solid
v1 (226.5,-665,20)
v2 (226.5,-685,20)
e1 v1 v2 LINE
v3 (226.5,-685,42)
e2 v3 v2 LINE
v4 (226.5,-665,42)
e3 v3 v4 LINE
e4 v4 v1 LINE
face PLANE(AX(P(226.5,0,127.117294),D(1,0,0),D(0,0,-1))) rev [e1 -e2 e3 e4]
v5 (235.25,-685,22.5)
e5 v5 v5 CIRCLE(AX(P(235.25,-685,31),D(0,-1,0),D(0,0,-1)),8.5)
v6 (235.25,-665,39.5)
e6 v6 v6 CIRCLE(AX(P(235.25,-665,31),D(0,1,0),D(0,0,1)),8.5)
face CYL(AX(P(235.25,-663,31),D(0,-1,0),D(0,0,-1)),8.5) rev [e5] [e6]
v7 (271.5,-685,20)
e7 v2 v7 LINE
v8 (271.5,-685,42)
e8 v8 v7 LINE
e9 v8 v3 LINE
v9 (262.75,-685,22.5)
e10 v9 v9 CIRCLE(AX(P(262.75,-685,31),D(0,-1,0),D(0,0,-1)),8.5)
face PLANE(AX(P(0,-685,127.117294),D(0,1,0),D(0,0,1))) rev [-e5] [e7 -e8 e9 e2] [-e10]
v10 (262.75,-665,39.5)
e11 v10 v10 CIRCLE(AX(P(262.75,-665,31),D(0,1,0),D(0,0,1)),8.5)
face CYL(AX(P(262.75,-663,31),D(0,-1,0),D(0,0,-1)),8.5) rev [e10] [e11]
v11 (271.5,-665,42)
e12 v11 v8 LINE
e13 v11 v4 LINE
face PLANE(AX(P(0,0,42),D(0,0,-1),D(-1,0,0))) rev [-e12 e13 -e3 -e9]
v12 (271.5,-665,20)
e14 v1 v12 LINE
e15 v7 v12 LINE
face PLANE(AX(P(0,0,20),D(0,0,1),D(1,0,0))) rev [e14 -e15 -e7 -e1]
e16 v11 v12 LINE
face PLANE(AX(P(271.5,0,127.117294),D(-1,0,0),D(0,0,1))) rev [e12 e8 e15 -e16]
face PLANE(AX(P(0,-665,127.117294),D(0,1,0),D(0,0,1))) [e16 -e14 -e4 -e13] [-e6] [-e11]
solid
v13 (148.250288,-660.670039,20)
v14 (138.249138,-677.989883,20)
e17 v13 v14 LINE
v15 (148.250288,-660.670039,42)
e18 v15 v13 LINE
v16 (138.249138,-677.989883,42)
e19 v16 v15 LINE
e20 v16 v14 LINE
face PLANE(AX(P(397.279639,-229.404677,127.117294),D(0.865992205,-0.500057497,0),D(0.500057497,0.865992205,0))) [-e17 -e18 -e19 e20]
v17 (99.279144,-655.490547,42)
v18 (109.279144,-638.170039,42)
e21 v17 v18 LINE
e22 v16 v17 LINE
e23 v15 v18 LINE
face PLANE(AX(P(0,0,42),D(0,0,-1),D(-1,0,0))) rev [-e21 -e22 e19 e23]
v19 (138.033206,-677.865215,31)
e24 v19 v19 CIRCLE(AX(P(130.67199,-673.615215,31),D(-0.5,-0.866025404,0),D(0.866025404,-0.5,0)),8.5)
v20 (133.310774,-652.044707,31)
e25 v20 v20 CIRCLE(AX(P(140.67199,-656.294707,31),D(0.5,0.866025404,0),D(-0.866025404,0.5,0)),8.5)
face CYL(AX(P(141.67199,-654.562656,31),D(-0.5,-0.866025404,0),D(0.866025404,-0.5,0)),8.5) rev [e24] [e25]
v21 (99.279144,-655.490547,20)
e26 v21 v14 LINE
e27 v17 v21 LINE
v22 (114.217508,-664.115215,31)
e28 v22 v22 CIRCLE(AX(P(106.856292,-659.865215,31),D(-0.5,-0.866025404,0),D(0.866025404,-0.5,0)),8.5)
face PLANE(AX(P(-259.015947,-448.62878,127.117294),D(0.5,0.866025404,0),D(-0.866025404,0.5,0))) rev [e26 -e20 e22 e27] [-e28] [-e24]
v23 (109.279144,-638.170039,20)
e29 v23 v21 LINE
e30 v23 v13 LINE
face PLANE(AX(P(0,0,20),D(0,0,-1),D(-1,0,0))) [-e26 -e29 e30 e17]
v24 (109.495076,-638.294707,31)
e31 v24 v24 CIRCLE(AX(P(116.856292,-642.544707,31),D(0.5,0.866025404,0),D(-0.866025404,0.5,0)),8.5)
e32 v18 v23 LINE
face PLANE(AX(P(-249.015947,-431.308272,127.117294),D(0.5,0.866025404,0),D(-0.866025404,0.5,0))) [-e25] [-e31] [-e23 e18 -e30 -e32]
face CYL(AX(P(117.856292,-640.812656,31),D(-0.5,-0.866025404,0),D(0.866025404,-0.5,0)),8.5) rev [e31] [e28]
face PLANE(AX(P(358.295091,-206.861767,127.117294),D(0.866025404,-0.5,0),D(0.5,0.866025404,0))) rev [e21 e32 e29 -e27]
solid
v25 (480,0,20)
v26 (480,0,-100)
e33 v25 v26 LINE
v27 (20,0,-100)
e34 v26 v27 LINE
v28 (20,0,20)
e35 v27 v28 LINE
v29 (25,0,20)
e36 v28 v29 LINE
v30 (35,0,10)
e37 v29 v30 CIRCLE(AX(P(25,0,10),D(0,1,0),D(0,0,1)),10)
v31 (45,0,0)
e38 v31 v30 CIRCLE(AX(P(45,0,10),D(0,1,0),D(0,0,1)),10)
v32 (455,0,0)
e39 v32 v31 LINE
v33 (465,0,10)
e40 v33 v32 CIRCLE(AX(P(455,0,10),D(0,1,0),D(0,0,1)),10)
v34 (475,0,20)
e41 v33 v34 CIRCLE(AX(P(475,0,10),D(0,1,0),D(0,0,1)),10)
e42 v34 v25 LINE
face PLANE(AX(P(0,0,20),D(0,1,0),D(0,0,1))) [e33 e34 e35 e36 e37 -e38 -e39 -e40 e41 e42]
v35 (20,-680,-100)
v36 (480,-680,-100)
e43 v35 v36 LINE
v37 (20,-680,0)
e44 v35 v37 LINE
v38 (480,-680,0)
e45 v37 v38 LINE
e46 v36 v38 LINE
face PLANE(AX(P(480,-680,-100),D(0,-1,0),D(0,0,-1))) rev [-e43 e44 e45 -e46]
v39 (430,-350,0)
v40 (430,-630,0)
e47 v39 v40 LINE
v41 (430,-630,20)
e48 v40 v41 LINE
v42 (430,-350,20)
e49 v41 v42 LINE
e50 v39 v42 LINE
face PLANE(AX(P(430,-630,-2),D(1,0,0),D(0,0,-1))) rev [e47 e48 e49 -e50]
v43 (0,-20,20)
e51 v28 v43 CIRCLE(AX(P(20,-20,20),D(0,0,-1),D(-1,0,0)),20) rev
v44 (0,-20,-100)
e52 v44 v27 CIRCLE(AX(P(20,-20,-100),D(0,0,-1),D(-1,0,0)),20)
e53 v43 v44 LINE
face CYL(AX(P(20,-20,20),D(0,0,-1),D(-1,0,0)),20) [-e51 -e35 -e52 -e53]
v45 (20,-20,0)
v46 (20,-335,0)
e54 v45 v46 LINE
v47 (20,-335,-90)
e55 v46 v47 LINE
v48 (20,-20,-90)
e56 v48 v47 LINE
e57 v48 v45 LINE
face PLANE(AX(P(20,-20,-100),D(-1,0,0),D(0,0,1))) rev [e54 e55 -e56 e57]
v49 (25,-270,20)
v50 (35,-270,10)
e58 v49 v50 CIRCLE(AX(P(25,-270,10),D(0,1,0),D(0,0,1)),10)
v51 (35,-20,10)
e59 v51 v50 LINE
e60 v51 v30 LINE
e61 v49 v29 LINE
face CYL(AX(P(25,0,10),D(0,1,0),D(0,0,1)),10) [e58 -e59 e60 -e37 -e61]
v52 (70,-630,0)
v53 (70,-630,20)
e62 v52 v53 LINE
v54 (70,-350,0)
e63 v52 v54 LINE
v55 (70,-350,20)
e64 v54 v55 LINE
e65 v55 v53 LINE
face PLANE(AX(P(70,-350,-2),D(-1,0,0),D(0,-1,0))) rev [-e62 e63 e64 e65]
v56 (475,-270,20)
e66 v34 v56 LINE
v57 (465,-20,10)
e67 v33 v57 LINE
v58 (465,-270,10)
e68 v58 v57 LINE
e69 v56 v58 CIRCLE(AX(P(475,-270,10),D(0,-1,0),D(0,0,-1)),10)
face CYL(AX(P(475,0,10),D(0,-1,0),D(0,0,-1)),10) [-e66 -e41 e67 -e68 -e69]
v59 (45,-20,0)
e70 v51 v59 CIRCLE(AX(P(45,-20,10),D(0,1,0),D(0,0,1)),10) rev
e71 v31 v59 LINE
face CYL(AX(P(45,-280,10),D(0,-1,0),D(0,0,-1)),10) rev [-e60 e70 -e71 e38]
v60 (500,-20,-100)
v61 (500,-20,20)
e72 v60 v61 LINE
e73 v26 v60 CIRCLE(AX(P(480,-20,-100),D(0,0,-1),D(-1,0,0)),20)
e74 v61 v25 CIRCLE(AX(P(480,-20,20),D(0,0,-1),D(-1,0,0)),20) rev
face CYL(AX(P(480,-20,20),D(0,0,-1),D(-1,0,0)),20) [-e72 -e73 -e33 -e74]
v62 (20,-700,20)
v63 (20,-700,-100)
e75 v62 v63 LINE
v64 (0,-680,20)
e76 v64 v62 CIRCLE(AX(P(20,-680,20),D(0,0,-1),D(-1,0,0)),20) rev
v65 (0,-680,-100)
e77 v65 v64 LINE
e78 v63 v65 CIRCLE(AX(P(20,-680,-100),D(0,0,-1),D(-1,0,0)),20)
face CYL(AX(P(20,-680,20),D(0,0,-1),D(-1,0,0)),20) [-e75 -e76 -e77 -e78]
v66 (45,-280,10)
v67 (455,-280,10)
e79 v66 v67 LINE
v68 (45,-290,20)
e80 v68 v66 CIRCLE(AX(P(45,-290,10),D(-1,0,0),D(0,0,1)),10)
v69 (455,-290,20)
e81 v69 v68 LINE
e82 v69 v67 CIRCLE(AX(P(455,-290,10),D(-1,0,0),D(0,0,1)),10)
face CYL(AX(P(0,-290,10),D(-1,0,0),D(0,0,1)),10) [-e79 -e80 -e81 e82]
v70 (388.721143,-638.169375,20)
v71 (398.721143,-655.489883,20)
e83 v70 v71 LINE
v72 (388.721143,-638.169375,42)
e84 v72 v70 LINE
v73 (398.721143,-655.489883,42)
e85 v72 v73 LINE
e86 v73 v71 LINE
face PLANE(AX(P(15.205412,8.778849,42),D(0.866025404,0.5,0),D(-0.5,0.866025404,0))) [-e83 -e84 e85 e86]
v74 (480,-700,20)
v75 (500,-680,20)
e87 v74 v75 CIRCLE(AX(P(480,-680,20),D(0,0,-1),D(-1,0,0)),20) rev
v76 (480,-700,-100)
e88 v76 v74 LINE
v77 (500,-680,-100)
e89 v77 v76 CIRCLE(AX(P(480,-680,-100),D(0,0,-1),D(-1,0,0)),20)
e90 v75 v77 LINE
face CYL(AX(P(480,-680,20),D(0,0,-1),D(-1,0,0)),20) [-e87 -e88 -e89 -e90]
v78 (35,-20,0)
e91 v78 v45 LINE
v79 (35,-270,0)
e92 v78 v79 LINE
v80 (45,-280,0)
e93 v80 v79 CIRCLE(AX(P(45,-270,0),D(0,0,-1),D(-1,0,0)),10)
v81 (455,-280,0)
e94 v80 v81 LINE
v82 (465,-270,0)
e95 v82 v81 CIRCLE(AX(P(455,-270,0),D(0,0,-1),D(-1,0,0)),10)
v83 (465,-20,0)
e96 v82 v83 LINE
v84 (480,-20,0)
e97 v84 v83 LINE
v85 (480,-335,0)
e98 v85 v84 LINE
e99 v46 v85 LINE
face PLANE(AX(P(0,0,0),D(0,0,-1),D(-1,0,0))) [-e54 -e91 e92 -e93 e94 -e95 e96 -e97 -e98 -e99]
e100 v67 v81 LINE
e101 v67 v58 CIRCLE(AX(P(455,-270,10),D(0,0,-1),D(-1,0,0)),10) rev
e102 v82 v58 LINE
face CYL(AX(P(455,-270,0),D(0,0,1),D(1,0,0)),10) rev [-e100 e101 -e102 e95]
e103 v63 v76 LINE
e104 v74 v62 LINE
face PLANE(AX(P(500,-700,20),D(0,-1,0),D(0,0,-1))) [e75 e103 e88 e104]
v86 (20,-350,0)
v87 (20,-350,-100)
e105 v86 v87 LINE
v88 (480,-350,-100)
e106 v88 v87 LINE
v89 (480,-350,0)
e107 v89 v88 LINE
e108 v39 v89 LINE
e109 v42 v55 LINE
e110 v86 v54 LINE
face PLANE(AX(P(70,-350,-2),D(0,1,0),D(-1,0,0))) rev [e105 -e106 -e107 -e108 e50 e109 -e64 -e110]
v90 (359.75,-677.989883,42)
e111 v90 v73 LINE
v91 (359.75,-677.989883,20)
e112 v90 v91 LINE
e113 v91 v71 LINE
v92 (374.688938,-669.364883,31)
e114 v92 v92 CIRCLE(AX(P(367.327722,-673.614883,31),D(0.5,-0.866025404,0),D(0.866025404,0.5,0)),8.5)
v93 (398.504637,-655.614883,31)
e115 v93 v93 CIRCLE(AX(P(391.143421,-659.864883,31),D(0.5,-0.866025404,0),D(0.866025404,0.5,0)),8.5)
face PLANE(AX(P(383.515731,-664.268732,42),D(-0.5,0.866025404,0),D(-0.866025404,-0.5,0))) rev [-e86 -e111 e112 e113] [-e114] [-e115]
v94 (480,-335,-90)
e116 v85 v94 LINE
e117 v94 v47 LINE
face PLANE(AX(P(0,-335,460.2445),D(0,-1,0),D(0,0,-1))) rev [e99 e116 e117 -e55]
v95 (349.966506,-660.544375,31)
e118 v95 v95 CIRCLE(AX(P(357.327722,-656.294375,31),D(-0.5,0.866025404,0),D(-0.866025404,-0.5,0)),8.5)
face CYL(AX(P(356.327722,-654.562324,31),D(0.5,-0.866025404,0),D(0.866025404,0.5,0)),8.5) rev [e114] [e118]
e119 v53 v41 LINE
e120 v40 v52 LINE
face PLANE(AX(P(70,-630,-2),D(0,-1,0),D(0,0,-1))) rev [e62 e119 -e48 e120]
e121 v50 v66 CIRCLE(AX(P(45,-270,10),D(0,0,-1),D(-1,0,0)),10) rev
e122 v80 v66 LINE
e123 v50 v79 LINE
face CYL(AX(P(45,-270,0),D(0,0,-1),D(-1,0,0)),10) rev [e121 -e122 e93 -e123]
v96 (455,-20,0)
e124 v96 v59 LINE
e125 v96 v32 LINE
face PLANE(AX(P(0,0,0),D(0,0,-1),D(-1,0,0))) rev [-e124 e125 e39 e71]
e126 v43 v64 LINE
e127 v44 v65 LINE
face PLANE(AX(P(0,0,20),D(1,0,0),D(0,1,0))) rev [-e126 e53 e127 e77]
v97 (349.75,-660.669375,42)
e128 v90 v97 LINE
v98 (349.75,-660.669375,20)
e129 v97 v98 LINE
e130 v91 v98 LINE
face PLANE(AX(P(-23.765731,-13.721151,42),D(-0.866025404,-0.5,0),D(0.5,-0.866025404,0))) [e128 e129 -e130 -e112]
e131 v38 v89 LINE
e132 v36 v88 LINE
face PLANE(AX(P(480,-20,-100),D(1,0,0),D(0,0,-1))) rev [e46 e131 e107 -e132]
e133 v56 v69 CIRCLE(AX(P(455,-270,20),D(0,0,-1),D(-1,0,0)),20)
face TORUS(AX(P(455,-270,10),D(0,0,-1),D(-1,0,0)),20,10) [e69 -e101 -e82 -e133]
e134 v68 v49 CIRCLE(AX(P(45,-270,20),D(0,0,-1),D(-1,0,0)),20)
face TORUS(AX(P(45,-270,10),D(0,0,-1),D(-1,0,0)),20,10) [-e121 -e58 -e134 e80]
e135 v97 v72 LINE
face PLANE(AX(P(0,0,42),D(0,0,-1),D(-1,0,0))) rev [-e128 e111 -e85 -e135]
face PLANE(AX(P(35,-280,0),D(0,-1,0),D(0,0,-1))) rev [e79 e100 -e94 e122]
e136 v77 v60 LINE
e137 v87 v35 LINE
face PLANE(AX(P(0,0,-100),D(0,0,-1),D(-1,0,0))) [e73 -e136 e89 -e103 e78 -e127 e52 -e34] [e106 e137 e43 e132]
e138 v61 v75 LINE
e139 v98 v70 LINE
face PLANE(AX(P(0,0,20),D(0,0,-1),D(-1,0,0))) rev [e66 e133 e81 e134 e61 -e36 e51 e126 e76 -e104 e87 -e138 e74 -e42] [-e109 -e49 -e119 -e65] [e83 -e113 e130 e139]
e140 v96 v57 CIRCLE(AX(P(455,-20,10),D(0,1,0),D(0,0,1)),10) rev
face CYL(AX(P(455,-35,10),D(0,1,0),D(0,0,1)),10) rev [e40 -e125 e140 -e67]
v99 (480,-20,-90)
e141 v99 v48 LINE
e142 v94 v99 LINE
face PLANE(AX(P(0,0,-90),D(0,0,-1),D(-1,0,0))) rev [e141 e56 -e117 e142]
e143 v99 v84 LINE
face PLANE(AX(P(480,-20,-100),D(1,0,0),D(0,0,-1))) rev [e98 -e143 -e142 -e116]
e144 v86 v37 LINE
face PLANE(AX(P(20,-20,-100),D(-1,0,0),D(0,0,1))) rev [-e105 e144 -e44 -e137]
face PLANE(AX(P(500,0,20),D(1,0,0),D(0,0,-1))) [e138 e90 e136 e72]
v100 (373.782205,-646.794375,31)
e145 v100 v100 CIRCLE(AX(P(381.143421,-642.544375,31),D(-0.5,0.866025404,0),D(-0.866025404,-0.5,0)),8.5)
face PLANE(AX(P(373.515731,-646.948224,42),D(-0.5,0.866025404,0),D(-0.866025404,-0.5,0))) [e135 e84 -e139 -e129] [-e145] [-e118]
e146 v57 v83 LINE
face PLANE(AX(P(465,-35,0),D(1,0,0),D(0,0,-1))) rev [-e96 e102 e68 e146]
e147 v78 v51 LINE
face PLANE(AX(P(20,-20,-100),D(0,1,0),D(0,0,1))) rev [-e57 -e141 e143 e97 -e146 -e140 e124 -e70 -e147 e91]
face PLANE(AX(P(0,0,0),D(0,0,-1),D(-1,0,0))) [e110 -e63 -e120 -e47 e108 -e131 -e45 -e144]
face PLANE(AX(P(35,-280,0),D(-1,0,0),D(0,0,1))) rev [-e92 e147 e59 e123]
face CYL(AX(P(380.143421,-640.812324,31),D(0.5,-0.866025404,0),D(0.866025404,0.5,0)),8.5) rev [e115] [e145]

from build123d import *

# Parameters (mm, degrees)
SCHIZZO1_W                     = 500
SCHIZZO1_H                     = 700
ESTRUSIONE_ESTRUSIONE4_DEPTH   = 20
SCHIZZO1_4_W                   = 500
SCHIZZO1_4_H                   = 700
SCHIZZO1_4_W_2                 = 460
SCHIZZO1_4_H_2                 = 660
ESTRUSIONE_ESTRUSIONE5_DEPTH   = 100
ESTRUSIONE_ESTRUSIONE6_START   = 20
ESTRUSIONE_ESTRUSIONE6_DEPTH   = 22
SCHIZZO2_W                     = 45
SCHIZZO2_H                     = 20
ESTRUSIONE_ESTRUSIONE6_2_DEPTH = 22
ESTRUSIONE_ESTRUSIONE7_START   = 20
ESTRUSIONE_ESTRUSIONE7_DEPTH   = 22
SCHIZZO6_R                     = 8.5
TAGLIO_ESTRUSIONE1_DEPTH       = 22
SCHIZZO7_R                     = 8.5
TAGLIO_ESTRUSIONE2_DEPTH       = 22
SCHIZZO8_R                     = 8.5
TAGLIO_ESTRUSIONE3_DEPTH       = 22
SCHIZZO10_W                    = 360
SCHIZZO10_H                    = 280
TAGLIO_ESTRUSIONE4_DEPTH       = 22
RACCORDO1_R                    = 20
RACCORDO2_R                    = 20
RACCORDO3_R                    = 20
RACCORDO4_R                    = 20
SCHIZZO11_W                    = 460
SCHIZZO11_H                    = 15
ESTRUSIONE_ESTRUSIONE8_DEPTH   = 100
SCHIZZO11_3_W                  = 460
SCHIZZO11_3_H                  = 315
ESTRUSIONE_ESTRUSIONE9_DEPTH   = 10
TAGLIO_ESTRUSIONE5_DEPTH       = 20
RACCORDO5_R                    = 10
RACCORDO6_R                    = 10
RACCORDO7_R                    = 10
RACCORDO8_R                    = 10
RACCORDO9_R                    = 10


with BuildPart() as part:
    # Schizzo1 → Estrusione-Estrusione4 (new body)
    with BuildSketch(Plane.XY):
        with Locations((250, -350)):
            Rectangle(SCHIZZO1_W, SCHIZZO1_H)
    extrude(amount=ESTRUSIONE_ESTRUSIONE4_DEPTH)

    # Schizzo1<4> → Estrusione-Estrusione5 (add)
    with BuildSketch(Plane.XY):
        with Locations((250, -350)):
            Rectangle(SCHIZZO1_4_W, SCHIZZO1_4_H)
        with Locations((250, -350)):
            Rectangle(SCHIZZO1_4_W_2, SCHIZZO1_4_H_2, mode=Mode.SUBTRACT)
    extrude(amount=-ESTRUSIONE_ESTRUSIONE5_DEPTH)

    # Schizzo2<3> → Estrusione-Estrusione7 (add)
    with BuildSketch(Plane.XY.offset(ESTRUSIONE_ESTRUSIONE7_START)):
        Polygon((359.75, -677.989883085), (398.72114317, -655.489883085), (388.72114317, -638.169375009), (349.75, -660.669375009), align=None)
    extrude(amount=ESTRUSIONE_ESTRUSIONE7_DEPTH)

    # Schizzo8 → Taglio-Estrusione3 (cut)
    with BuildSketch(Plane(origin=(383.51573113, -664.26873182, 0), x_dir=(0.8660254037844405, 0.49999999999999684, 0), z_dir=(0.49999999999999684, -0.8660254037844405, 0))):
        with Locations((-18.692302531, 31)):
            Circle(SCHIZZO8_R)
        with Locations((8.807697469, 31)):
            Circle(SCHIZZO8_R)
    extrude(amount=-TAGLIO_ESTRUSIONE3_DEPTH, mode=Mode.SUBTRACT)

    # Schizzo10 → Taglio-Estrusione4 (cut)
    with BuildSketch(Plane.XY.offset(20)):
        with Locations((250, -490)):
            Rectangle(SCHIZZO10_W, SCHIZZO10_H)
    extrude(amount=-TAGLIO_ESTRUSIONE4_DEPTH, mode=Mode.SUBTRACT)

    # Raccordo1
    raccordo1_edges = [part.edges().sort_by_distance(p)[0] for p in [
        (0, 0, -40),
    ]]
    fillet(raccordo1_edges, radius=RACCORDO1_R)

    # Raccordo2
    raccordo2_edges = [part.edges().sort_by_distance(p)[0] for p in [
        (500, 0, -40),
    ]]
    fillet(raccordo2_edges, radius=RACCORDO2_R)

    # Raccordo3
    raccordo3_edges = [part.edges().sort_by_distance(p)[0] for p in [
        (500, -700, -40),
    ]]
    fillet(raccordo3_edges, radius=RACCORDO3_R)

    # Raccordo4
    raccordo4_edges = [part.edges().sort_by_distance(p)[0] for p in [
        (0, -700, -40),
    ]]
    fillet(raccordo4_edges, radius=RACCORDO4_R)

    # Schizzo11 → Estrusione-Estrusione8 (add)
    with BuildSketch(Plane(origin=(0, 0, -100), x_dir=(-1, 0, 0), z_dir=(0, 0, -1))):
        with Locations((-250, -342.5)):
            Rectangle(SCHIZZO11_W, SCHIZZO11_H)
    extrude(amount=-ESTRUSIONE_ESTRUSIONE8_DEPTH)

    # Schizzo11<3> → Estrusione-Estrusione9 (add)
    with BuildSketch(Plane(origin=(0, 0, -100), x_dir=(-1, 0, 0), z_dir=(0, 0, -1))):
        with Locations((-250, -177.5)):
            Rectangle(SCHIZZO11_3_W, SCHIZZO11_3_H)
    extrude(amount=-ESTRUSIONE_ESTRUSIONE9_DEPTH)

    # Schizzo12 → Taglio-Estrusione5 (cut)
    with BuildSketch(Plane.XY.offset(20)):
        Polygon((35, -35), (35, 0), (465, 0), (465, -35), (465, -280), (35, -280), align=None)
    extrude(amount=-TAGLIO_ESTRUSIONE5_DEPTH, mode=Mode.SUBTRACT)

    # Raccordo5
    raccordo5_edges = [part.edges().sort_by_distance(p)[0] for p in [
        (35, -280, 10),
    ]]
    fillet(raccordo5_edges, radius=RACCORDO5_R)

    # Raccordo6
    raccordo6_edges = [part.edges().sort_by_distance(p)[0] for p in [
        (465, -280, 10),
    ]]
    fillet(raccordo6_edges, radius=RACCORDO6_R)

    # Raccordo7
    # the kernel refuses this fillet: 10 mm, written as the material it adds along each edge
    with BuildSketch(Plane(origin=(465, -20, 0), x_dir=(0, 0, 1), z_dir=(0, 1, 0))) as raccordo7_piece_1:
        with BuildLine():
            CenterArc((RACCORDO7_R, -RACCORDO7_R), RACCORDO7_R, 90, 90)
            Line((0, -RACCORDO7_R), (0, 0))
            Line((0, 0), (RACCORDO7_R, 0))
        make_face()
    extrude(amount=20)

    # Raccordo8
    # the kernel refuses this fillet: 10 mm, written as the material it adds along each edge
    with BuildSketch(Plane(origin=(35, 0, 0), x_dir=(1, 0, 0), z_dir=(0, -1, 0))) as raccordo8_piece_1:
        with BuildLine():
            CenterArc((RACCORDO8_R, RACCORDO8_R), RACCORDO8_R, 180, 90)
            Line((0, RACCORDO8_R), (0, 0))
            Line((0, 0), (RACCORDO8_R, 0))
        make_face()
    extrude(amount=20)

    # Raccordo9
    raccordo9_edges = [part.edges().sort_by_distance(p)[0] for p in [
        (35, -135, 20),
        (250, -280, 20),
        (37.928932188, -277.071067812, 20),
        (465, -135, 20),
        (462.071067812, -277.071067812, 20),
    ]]
    fillet(raccordo9_edges, radius=RACCORDO9_R)


with BuildPart() as body_2:
    # Schizzo2 → Estrusione-Estrusione6 (new body)
    with BuildSketch(Plane.XY.offset(ESTRUSIONE_ESTRUSIONE6_START)):
        Polygon((148.250287501, -660.670038978), (138.249137563, -677.989883085), (99.279144353, -655.490547015), (109.279144331, -638.170038978), align=None)
    extrude(amount=ESTRUSIONE_ESTRUSIONE6_DEPTH)

    # Schizzo6 → Taglio-Estrusione1 (cut)
    with BuildSketch(Plane(origin=(-259.01594674, -448.628779724, 0), x_dir=(0.8660254037844389, -0.49999999999999967, 0), z_dir=(-0.49999999999999967, -0.8660254037844389, 0))):
        with Locations((422.472870653, 31)):
            Circle(SCHIZZO6_R)
        with Locations((449.972870653, 31)):
            Circle(SCHIZZO6_R)
    extrude(amount=-TAGLIO_ESTRUSIONE1_DEPTH, mode=Mode.SUBTRACT)


with BuildPart() as body_3:
    # Schizzo2 → Estrusione-Estrusione6 2 (new body)
    with BuildSketch(Plane.XY.offset(ESTRUSIONE_ESTRUSIONE6_START)):
        with Locations((249, -675)):
            Rectangle(SCHIZZO2_W, SCHIZZO2_H)
    extrude(amount=ESTRUSIONE_ESTRUSIONE6_2_DEPTH)

    # Schizzo7 → Taglio-Estrusione2 (cut)
    with BuildSketch(Plane.XZ.offset(685)):
        with Locations(Location((235.25, 31, 0), (0, 0, 270))):
            Circle(SCHIZZO7_R)
        with Locations(Location((262.75, 31, 0), (0, 0, 270))):
            Circle(SCHIZZO7_R)
    extrude(amount=-TAGLIO_ESTRUSIONE2_DEPTH, mode=Mode.SUBTRACT)


solid = Compound([part.part, body_2.part, body_3.part])
